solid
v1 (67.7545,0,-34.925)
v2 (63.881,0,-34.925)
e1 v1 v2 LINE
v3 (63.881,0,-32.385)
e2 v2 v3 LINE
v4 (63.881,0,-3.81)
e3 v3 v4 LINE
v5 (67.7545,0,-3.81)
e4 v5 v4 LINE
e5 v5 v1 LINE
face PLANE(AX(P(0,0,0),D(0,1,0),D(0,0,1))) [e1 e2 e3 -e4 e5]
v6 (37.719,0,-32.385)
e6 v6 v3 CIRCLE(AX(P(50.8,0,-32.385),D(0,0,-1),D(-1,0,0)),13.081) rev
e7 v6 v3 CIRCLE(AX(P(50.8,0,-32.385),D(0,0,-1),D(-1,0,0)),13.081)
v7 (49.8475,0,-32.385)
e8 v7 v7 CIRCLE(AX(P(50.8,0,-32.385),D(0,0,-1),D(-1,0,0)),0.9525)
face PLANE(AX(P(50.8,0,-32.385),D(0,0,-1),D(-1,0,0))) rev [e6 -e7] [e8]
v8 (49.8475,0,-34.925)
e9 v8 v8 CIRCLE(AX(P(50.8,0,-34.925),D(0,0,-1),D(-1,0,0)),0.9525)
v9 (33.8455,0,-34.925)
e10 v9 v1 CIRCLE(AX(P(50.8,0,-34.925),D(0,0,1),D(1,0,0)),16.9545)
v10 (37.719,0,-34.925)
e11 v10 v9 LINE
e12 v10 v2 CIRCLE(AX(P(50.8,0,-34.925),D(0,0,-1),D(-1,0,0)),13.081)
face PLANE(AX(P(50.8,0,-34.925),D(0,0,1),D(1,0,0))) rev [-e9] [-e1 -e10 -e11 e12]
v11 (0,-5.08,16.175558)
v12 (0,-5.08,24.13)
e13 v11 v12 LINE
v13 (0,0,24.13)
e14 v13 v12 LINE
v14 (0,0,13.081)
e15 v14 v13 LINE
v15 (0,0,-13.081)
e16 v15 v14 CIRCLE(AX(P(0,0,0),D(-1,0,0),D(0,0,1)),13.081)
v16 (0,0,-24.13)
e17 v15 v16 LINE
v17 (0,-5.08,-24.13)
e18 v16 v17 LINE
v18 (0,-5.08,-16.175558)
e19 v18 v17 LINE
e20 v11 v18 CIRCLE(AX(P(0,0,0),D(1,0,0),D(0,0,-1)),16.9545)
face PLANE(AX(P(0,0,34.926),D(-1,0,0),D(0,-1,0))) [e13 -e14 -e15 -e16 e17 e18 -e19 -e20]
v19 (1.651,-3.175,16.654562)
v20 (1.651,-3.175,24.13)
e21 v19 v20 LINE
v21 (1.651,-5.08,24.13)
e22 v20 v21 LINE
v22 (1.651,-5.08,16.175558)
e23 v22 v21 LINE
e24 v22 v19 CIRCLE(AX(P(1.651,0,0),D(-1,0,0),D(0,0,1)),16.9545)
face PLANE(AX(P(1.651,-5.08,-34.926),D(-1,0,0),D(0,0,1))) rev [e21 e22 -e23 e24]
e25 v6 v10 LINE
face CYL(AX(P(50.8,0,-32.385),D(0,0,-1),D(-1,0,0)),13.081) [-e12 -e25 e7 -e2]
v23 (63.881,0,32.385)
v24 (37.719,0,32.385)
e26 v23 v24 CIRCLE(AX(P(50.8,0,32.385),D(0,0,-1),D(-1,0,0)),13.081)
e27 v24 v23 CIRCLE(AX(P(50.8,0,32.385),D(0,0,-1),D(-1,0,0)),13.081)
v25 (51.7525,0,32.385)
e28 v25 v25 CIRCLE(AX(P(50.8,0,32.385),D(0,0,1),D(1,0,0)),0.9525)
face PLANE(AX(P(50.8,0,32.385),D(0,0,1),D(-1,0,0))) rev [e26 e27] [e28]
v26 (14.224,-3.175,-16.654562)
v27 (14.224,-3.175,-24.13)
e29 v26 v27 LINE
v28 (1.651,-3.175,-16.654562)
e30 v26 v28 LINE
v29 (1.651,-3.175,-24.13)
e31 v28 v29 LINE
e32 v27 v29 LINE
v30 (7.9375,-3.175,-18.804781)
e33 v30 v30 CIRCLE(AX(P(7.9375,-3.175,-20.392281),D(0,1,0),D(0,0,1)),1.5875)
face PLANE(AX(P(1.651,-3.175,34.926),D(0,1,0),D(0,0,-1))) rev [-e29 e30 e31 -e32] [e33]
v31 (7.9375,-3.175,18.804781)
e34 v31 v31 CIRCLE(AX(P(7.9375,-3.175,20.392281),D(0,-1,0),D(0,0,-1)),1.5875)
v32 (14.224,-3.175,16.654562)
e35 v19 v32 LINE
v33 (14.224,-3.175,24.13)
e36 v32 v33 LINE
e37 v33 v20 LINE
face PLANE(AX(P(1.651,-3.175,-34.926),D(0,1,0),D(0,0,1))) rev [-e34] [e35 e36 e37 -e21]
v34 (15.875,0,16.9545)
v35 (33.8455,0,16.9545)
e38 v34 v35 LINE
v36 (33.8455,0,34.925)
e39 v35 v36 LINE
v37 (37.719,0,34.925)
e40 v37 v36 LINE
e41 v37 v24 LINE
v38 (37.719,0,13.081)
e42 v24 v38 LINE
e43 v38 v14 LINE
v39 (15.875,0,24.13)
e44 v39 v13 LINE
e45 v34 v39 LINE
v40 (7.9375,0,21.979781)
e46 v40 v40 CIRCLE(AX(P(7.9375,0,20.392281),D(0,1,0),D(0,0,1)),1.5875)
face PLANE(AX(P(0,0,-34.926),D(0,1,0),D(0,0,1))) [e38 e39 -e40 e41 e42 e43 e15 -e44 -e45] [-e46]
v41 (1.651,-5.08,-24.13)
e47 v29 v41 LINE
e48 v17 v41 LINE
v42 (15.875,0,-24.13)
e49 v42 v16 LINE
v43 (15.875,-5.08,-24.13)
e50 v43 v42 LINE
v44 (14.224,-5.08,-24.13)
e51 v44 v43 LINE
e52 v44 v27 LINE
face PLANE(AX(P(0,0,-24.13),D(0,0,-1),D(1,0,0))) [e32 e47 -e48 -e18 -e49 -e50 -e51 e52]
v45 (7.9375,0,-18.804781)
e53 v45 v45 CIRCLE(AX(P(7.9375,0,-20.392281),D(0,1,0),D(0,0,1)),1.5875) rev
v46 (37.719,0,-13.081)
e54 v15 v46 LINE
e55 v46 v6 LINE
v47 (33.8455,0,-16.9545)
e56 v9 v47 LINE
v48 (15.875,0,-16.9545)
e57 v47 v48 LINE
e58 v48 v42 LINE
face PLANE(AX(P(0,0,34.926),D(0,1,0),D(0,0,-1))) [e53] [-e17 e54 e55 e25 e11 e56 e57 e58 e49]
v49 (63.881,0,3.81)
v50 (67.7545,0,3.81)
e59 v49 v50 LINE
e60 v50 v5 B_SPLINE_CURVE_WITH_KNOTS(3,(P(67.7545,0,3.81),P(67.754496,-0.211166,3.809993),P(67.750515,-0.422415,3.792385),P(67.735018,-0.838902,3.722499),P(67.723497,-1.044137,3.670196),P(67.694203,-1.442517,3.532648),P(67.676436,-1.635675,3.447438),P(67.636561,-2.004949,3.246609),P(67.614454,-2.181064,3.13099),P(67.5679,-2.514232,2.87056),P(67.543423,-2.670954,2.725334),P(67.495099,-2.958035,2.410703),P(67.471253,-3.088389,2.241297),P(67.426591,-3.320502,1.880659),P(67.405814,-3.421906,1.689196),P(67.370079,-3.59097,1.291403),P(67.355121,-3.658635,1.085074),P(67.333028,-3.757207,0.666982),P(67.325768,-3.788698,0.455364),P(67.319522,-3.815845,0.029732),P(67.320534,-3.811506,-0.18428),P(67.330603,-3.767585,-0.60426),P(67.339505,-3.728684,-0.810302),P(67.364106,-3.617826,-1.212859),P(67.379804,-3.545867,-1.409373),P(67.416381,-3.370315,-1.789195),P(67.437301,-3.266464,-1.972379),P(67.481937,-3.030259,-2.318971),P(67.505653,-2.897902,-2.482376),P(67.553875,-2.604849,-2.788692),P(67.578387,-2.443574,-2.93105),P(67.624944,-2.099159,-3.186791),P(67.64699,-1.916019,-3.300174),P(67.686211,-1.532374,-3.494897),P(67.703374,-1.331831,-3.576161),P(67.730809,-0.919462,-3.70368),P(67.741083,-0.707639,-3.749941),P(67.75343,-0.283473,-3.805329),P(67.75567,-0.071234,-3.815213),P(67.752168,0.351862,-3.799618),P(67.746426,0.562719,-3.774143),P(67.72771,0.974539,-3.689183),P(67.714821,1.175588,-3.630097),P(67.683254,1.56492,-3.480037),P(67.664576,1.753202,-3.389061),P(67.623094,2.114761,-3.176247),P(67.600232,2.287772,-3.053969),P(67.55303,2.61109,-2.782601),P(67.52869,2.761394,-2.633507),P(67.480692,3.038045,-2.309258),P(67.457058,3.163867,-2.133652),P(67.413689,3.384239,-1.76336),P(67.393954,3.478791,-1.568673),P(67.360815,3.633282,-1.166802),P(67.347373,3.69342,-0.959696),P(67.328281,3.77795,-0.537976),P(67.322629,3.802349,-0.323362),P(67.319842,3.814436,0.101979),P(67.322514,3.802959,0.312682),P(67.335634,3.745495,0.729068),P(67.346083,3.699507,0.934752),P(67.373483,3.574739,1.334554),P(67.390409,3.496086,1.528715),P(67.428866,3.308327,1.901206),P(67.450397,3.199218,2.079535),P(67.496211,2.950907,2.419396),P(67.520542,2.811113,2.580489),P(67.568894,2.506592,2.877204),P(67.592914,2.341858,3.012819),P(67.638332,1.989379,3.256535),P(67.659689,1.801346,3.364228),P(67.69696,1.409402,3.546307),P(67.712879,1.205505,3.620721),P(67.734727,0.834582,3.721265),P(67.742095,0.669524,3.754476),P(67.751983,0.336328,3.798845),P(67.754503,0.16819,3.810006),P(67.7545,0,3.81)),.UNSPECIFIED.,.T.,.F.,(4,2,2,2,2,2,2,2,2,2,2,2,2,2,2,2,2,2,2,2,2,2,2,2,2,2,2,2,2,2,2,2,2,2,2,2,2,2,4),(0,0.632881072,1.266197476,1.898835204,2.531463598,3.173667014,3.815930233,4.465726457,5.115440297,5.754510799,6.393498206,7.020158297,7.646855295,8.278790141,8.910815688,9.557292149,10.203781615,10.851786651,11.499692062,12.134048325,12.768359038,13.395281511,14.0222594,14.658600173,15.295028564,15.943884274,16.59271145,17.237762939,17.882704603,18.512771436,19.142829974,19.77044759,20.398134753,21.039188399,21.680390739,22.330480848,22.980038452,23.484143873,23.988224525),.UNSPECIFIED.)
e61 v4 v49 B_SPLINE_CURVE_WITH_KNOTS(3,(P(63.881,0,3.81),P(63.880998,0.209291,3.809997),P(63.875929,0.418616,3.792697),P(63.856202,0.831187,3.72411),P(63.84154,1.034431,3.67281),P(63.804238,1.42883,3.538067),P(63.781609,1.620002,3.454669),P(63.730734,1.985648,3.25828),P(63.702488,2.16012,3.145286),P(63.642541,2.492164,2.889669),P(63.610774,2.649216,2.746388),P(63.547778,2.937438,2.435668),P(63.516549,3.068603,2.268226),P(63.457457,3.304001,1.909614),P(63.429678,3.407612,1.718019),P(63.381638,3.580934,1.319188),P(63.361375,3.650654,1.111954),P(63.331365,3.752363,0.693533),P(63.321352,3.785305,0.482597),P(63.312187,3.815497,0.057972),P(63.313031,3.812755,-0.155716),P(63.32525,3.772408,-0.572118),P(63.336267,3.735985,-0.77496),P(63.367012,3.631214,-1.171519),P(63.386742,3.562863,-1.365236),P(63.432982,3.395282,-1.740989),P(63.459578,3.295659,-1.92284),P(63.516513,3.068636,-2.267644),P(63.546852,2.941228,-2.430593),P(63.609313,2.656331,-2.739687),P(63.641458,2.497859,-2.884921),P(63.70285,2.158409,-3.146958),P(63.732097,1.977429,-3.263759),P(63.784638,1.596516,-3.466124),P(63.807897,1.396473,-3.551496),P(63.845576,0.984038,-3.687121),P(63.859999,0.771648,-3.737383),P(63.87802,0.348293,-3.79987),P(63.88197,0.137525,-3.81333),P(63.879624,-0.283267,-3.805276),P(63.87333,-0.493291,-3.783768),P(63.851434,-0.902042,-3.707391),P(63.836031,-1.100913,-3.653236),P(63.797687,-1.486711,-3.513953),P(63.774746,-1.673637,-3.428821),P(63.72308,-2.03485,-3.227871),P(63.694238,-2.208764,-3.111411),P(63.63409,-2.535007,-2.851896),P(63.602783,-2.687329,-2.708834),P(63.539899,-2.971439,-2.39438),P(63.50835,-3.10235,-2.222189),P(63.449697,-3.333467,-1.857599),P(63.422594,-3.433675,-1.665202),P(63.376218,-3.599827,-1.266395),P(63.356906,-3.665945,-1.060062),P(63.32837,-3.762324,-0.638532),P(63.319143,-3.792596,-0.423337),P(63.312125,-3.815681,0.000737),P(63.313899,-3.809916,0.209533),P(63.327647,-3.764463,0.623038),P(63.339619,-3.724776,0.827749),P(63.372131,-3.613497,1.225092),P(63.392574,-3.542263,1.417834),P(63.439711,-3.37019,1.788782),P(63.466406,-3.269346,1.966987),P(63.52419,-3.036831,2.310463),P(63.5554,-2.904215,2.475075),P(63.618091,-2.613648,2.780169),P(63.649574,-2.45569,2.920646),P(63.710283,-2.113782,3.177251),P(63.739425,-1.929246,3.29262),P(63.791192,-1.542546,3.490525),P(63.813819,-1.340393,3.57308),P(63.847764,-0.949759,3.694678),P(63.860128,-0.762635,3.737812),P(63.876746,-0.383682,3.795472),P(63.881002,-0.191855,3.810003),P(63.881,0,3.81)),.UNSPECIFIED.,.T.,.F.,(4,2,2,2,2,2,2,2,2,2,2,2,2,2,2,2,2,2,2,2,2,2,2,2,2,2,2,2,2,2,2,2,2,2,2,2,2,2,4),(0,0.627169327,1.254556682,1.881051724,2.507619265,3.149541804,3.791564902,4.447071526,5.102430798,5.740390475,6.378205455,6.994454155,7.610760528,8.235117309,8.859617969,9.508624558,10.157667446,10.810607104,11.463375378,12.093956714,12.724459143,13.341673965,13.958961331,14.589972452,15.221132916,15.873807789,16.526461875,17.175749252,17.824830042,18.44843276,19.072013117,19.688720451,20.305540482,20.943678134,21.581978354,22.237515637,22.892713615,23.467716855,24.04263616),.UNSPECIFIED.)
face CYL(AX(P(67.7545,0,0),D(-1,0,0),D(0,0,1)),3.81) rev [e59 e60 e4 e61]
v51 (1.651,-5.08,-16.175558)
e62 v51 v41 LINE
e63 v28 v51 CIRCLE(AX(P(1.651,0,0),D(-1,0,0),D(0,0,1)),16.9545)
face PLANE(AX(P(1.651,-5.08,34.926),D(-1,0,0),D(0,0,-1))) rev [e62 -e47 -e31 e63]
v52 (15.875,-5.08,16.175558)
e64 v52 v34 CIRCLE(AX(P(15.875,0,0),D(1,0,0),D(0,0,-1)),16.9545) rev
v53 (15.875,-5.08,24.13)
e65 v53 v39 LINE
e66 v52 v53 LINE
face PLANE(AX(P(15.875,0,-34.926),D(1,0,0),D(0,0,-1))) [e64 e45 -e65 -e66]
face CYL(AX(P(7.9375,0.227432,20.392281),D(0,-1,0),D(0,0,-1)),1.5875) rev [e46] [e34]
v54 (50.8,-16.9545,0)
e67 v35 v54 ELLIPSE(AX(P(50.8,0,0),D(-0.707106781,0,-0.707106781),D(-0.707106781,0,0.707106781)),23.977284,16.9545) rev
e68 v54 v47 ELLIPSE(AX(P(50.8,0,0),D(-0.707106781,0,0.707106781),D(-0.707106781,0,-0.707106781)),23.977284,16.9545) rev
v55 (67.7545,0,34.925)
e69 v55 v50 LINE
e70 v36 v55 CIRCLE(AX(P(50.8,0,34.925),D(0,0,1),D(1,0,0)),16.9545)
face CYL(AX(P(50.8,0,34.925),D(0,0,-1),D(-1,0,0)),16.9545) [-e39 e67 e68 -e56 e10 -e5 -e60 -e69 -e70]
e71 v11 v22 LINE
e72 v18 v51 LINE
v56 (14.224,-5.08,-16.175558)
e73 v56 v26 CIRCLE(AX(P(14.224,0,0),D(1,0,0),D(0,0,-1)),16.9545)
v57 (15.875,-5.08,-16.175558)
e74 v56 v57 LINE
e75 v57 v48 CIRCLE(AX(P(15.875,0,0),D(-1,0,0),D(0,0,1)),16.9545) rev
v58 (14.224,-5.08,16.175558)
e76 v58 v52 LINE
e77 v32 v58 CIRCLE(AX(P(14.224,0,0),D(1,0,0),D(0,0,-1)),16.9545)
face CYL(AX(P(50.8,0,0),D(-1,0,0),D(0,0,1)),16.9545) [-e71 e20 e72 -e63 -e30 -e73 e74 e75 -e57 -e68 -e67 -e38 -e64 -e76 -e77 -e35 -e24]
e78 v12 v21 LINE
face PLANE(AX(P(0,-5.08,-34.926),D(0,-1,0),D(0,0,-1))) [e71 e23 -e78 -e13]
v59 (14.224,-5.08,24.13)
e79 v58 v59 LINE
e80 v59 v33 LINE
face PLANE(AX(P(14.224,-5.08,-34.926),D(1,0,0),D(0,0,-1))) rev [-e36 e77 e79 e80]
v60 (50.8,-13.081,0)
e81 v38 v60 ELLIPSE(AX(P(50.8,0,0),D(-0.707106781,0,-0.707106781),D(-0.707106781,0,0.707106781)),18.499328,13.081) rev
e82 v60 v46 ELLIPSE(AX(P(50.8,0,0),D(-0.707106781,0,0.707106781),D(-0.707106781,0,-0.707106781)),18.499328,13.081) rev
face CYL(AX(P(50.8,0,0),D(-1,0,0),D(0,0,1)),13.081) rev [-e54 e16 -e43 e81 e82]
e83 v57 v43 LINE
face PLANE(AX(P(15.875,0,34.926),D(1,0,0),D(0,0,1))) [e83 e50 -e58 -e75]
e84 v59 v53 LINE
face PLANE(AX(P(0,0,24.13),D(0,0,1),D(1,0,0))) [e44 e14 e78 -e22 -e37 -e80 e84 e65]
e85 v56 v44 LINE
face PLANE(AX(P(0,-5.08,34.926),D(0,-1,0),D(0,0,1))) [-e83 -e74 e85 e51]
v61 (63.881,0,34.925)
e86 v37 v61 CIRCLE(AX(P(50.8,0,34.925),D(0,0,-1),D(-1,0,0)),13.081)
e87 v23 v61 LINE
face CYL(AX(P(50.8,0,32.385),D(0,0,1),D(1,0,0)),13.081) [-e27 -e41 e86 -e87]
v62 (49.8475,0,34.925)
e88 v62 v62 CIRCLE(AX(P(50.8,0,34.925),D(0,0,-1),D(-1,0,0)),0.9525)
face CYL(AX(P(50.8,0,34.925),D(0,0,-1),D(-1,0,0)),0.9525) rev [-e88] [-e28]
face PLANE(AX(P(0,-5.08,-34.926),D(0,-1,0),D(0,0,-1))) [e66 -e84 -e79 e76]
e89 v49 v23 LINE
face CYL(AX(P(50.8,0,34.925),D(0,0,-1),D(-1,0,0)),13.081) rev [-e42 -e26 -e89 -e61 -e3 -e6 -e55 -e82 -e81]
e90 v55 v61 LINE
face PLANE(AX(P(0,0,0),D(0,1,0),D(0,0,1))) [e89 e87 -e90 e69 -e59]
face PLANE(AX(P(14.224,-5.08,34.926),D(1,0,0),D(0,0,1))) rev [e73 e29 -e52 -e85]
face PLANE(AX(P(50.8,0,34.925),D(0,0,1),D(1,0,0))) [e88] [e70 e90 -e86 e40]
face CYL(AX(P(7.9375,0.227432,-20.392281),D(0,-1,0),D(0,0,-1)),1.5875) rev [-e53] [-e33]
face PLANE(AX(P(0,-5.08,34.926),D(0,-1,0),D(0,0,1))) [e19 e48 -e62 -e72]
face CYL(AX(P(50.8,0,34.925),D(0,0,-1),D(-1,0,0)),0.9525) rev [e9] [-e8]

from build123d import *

# Parameters (mm, degrees)
SKETCH1_R                = 16.9545
BOSS_EXTRUDE1_DEPTH      = 50.8
SKETCH2_R                = 16.9545
BOSS_EXTRUDE2_DEPTH      = 34.925
SKETCH3_R                = 13.081
CUT_EXTRUDE1_DEPTH       = 50.8
SKETCH5_R                = 13.081
CUT_EXTRUDE2_DEPTH       = 69.85
CUT_EXTRUDE4_DEPTH       = 79.088942658
CUT_EXTRUDE4_DEPTH_BACK  = 79.088942658
SKETCH6_R                = 3.81
BOSS_EXTRUDE3_REACH      = 93.464
BOSS_EXTRUDE3_END_RADIUS = 16.9545
SKETCH8_W                = 15.875
SKETCH8_H                = 5.08
CUT_EXTRUDE5_REACH       = 93.464
CUT_EXTRUDE5_END_RADIUS  = 16.9545
SKETCH9_W                = 12.573
SKETCH9_H                = 1.905
SKETCH10_R               = 1.5875
CUT_EXTRUDE6_DEPTH       = 78.461619779
SKETCH11_R               = 13.081
BOSS_EXTRUDE4_DEPTH      = 2.54
SKETCH13_R               = 0.9525
CUT_EXTRUDE8_DEPTH       = 99.778286437


with BuildPart() as part:
    # Sketch1 → Boss-Extrude1 (new body)
    with BuildSketch(Plane(origin=(0, 0, 0), x_dir=(0, 0, -1), z_dir=(1, 0, 0))):
        Circle(SKETCH1_R)
    extrude(amount=BOSS_EXTRUDE1_DEPTH)

    # Sketch2 → Boss-Extrude2 (add, symmetric)
    with BuildSketch(Plane.XY):
        with Locations((50.8, 0)):
            Circle(SKETCH2_R)
    extrude(amount=BOSS_EXTRUDE2_DEPTH, both=True)

    # Sketch3 → Cut-Extrude1 (cut)
    with BuildSketch(Plane.ZY):
        Circle(SKETCH3_R)
    extrude(amount=-CUT_EXTRUDE1_DEPTH, mode=Mode.SUBTRACT)

    # Sketch5 → Cut-Extrude2 (cut)
    with BuildSketch(Plane(origin=(0, 0, -34.925), x_dir=(-1, 0, 0), z_dir=(0, 0, -1))):
        with Locations((-50.8, 0)):
            Circle(SKETCH5_R)
    extrude(amount=-CUT_EXTRUDE2_DEPTH, mode=Mode.SUBTRACT)

    # Sketch6 → Cut-Extrude4 (cut, two sides: drawn at the far end of the back side and taken through both)
    with BuildSketch(Plane(origin=(0, 0, 0), x_dir=(0, 0, -1), z_dir=(1, 0, 0)).offset(-CUT_EXTRUDE4_DEPTH_BACK)):
        with Locations(Location((0, 0, 0), (0, 0, 180))):
            Circle(SKETCH6_R)
    extrude(amount=CUT_EXTRUDE4_DEPTH + CUT_EXTRUDE4_DEPTH_BACK, mode=Mode.SUBTRACT)

    # SurfaceCut1
    split(bisect_by=Plane(origin=(0, 0, 0), x_dir=(1, 0, 0), z_dir=(0, 1, 0)), keep=Keep.BOTTOM)


with BuildPart() as body_2:
    # Boss-Extrude3: up to this cylinder (the profile starts outside it)
    boss_extrude3_end = Plane(origin=(7.9375, 0, 0), z_dir=(-1, 0, 0)) * Cylinder(BOSS_EXTRUDE3_END_RADIUS, 221.837, mode=Mode.PRIVATE)
    # Sketch8 → Boss-Extrude3 (new, up to the surface)
    with BuildSketch(Plane.XY.offset(24.13), mode=Mode.PRIVATE) as boss_extrude3_sk1:
        with Locations((7.9375, -2.54)):
            Rectangle(SKETCH8_W, SKETCH8_H)
    boss_extrude3_tool1 = extrude(boss_extrude3_sk1.sketch, amount=-BOSS_EXTRUDE3_REACH, mode=Mode.PRIVATE) - boss_extrude3_end
    add(boss_extrude3_tool1.solids().sort_by_distance((7.9375, -2.54, 24.13))[0])

    # Cut-Extrude5: up to this cylinder (the profile starts outside it)
    cut_extrude5_end = Plane(origin=(7.9375, 0, 0), z_dir=(-1, 0, 0)) * Cylinder(CUT_EXTRUDE5_END_RADIUS, 221.837, mode=Mode.PRIVATE)
    # Sketch9 → Cut-Extrude5 (cut, up to the surface)
    with BuildSketch(Plane.XY.offset(24.13), mode=Mode.PRIVATE) as cut_extrude5_sk1:
        with Locations((7.9375, -4.1275)):
            Rectangle(SKETCH9_W, SKETCH9_H)
    cut_extrude5_tool1 = extrude(cut_extrude5_sk1.sketch, amount=-CUT_EXTRUDE5_REACH, mode=Mode.PRIVATE) - cut_extrude5_end
    add(cut_extrude5_tool1.solids().sort_by_distance((7.9375, -4.1275, 24.13))[0], mode=Mode.SUBTRACT)


with BuildPart() as body_3:
    # Mirror1: mirrored copy
    add(body_2.part.mirror(Plane.XY))


with BuildPart() as part_1:
    add(part.part)

    # Intersect1: read off the stored shape, not the designer's step
    # Intersect1: union body 3, body 2
    add(body_3.part)
    add(body_2.part)

    # Sketch10 → Cut-Extrude6 (cut, through all)
    with BuildSketch(Plane.XZ.offset(3.175)):
        with Locations(Location((7.9375, 20.392281148, 0), (0, 0, 270))):
            Circle(SKETCH10_R)
    cut_extrude6 = extrude(amount=-CUT_EXTRUDE6_DEPTH, mode=Mode.SUBTRACT)

    # Mirror2: Cut-Extrude6 across plane
    add(cut_extrude6.mirror(Plane.XY), mode=Mode.SUBTRACT)

    # Sketch11 → Boss-Extrude4 (add)
    with BuildSketch(Plane(origin=(0, 0, -34.925), x_dir=(-1, 0, 0), z_dir=(0, 0, -1))):
        with Locations((-50.8, 0)):
            Circle(SKETCH11_R)
    boss_extrude4 = extrude(amount=-BOSS_EXTRUDE4_DEPTH)

    # Mirror3: Boss-Extrude4 across plane
    add(boss_extrude4.mirror(Plane.XY))

    # Sketch13 → Cut-Extrude8 (cut, through all)
    with BuildSketch(Plane(origin=(0, 0, -34.925), x_dir=(-1, 0, 0), z_dir=(0, 0, -1))):
        with Locations((-50.8, 0)):
            Circle(SKETCH13_R)
    extrude(amount=-CUT_EXTRUDE8_DEPTH, mode=Mode.SUBTRACT)


solid = part_1.part
